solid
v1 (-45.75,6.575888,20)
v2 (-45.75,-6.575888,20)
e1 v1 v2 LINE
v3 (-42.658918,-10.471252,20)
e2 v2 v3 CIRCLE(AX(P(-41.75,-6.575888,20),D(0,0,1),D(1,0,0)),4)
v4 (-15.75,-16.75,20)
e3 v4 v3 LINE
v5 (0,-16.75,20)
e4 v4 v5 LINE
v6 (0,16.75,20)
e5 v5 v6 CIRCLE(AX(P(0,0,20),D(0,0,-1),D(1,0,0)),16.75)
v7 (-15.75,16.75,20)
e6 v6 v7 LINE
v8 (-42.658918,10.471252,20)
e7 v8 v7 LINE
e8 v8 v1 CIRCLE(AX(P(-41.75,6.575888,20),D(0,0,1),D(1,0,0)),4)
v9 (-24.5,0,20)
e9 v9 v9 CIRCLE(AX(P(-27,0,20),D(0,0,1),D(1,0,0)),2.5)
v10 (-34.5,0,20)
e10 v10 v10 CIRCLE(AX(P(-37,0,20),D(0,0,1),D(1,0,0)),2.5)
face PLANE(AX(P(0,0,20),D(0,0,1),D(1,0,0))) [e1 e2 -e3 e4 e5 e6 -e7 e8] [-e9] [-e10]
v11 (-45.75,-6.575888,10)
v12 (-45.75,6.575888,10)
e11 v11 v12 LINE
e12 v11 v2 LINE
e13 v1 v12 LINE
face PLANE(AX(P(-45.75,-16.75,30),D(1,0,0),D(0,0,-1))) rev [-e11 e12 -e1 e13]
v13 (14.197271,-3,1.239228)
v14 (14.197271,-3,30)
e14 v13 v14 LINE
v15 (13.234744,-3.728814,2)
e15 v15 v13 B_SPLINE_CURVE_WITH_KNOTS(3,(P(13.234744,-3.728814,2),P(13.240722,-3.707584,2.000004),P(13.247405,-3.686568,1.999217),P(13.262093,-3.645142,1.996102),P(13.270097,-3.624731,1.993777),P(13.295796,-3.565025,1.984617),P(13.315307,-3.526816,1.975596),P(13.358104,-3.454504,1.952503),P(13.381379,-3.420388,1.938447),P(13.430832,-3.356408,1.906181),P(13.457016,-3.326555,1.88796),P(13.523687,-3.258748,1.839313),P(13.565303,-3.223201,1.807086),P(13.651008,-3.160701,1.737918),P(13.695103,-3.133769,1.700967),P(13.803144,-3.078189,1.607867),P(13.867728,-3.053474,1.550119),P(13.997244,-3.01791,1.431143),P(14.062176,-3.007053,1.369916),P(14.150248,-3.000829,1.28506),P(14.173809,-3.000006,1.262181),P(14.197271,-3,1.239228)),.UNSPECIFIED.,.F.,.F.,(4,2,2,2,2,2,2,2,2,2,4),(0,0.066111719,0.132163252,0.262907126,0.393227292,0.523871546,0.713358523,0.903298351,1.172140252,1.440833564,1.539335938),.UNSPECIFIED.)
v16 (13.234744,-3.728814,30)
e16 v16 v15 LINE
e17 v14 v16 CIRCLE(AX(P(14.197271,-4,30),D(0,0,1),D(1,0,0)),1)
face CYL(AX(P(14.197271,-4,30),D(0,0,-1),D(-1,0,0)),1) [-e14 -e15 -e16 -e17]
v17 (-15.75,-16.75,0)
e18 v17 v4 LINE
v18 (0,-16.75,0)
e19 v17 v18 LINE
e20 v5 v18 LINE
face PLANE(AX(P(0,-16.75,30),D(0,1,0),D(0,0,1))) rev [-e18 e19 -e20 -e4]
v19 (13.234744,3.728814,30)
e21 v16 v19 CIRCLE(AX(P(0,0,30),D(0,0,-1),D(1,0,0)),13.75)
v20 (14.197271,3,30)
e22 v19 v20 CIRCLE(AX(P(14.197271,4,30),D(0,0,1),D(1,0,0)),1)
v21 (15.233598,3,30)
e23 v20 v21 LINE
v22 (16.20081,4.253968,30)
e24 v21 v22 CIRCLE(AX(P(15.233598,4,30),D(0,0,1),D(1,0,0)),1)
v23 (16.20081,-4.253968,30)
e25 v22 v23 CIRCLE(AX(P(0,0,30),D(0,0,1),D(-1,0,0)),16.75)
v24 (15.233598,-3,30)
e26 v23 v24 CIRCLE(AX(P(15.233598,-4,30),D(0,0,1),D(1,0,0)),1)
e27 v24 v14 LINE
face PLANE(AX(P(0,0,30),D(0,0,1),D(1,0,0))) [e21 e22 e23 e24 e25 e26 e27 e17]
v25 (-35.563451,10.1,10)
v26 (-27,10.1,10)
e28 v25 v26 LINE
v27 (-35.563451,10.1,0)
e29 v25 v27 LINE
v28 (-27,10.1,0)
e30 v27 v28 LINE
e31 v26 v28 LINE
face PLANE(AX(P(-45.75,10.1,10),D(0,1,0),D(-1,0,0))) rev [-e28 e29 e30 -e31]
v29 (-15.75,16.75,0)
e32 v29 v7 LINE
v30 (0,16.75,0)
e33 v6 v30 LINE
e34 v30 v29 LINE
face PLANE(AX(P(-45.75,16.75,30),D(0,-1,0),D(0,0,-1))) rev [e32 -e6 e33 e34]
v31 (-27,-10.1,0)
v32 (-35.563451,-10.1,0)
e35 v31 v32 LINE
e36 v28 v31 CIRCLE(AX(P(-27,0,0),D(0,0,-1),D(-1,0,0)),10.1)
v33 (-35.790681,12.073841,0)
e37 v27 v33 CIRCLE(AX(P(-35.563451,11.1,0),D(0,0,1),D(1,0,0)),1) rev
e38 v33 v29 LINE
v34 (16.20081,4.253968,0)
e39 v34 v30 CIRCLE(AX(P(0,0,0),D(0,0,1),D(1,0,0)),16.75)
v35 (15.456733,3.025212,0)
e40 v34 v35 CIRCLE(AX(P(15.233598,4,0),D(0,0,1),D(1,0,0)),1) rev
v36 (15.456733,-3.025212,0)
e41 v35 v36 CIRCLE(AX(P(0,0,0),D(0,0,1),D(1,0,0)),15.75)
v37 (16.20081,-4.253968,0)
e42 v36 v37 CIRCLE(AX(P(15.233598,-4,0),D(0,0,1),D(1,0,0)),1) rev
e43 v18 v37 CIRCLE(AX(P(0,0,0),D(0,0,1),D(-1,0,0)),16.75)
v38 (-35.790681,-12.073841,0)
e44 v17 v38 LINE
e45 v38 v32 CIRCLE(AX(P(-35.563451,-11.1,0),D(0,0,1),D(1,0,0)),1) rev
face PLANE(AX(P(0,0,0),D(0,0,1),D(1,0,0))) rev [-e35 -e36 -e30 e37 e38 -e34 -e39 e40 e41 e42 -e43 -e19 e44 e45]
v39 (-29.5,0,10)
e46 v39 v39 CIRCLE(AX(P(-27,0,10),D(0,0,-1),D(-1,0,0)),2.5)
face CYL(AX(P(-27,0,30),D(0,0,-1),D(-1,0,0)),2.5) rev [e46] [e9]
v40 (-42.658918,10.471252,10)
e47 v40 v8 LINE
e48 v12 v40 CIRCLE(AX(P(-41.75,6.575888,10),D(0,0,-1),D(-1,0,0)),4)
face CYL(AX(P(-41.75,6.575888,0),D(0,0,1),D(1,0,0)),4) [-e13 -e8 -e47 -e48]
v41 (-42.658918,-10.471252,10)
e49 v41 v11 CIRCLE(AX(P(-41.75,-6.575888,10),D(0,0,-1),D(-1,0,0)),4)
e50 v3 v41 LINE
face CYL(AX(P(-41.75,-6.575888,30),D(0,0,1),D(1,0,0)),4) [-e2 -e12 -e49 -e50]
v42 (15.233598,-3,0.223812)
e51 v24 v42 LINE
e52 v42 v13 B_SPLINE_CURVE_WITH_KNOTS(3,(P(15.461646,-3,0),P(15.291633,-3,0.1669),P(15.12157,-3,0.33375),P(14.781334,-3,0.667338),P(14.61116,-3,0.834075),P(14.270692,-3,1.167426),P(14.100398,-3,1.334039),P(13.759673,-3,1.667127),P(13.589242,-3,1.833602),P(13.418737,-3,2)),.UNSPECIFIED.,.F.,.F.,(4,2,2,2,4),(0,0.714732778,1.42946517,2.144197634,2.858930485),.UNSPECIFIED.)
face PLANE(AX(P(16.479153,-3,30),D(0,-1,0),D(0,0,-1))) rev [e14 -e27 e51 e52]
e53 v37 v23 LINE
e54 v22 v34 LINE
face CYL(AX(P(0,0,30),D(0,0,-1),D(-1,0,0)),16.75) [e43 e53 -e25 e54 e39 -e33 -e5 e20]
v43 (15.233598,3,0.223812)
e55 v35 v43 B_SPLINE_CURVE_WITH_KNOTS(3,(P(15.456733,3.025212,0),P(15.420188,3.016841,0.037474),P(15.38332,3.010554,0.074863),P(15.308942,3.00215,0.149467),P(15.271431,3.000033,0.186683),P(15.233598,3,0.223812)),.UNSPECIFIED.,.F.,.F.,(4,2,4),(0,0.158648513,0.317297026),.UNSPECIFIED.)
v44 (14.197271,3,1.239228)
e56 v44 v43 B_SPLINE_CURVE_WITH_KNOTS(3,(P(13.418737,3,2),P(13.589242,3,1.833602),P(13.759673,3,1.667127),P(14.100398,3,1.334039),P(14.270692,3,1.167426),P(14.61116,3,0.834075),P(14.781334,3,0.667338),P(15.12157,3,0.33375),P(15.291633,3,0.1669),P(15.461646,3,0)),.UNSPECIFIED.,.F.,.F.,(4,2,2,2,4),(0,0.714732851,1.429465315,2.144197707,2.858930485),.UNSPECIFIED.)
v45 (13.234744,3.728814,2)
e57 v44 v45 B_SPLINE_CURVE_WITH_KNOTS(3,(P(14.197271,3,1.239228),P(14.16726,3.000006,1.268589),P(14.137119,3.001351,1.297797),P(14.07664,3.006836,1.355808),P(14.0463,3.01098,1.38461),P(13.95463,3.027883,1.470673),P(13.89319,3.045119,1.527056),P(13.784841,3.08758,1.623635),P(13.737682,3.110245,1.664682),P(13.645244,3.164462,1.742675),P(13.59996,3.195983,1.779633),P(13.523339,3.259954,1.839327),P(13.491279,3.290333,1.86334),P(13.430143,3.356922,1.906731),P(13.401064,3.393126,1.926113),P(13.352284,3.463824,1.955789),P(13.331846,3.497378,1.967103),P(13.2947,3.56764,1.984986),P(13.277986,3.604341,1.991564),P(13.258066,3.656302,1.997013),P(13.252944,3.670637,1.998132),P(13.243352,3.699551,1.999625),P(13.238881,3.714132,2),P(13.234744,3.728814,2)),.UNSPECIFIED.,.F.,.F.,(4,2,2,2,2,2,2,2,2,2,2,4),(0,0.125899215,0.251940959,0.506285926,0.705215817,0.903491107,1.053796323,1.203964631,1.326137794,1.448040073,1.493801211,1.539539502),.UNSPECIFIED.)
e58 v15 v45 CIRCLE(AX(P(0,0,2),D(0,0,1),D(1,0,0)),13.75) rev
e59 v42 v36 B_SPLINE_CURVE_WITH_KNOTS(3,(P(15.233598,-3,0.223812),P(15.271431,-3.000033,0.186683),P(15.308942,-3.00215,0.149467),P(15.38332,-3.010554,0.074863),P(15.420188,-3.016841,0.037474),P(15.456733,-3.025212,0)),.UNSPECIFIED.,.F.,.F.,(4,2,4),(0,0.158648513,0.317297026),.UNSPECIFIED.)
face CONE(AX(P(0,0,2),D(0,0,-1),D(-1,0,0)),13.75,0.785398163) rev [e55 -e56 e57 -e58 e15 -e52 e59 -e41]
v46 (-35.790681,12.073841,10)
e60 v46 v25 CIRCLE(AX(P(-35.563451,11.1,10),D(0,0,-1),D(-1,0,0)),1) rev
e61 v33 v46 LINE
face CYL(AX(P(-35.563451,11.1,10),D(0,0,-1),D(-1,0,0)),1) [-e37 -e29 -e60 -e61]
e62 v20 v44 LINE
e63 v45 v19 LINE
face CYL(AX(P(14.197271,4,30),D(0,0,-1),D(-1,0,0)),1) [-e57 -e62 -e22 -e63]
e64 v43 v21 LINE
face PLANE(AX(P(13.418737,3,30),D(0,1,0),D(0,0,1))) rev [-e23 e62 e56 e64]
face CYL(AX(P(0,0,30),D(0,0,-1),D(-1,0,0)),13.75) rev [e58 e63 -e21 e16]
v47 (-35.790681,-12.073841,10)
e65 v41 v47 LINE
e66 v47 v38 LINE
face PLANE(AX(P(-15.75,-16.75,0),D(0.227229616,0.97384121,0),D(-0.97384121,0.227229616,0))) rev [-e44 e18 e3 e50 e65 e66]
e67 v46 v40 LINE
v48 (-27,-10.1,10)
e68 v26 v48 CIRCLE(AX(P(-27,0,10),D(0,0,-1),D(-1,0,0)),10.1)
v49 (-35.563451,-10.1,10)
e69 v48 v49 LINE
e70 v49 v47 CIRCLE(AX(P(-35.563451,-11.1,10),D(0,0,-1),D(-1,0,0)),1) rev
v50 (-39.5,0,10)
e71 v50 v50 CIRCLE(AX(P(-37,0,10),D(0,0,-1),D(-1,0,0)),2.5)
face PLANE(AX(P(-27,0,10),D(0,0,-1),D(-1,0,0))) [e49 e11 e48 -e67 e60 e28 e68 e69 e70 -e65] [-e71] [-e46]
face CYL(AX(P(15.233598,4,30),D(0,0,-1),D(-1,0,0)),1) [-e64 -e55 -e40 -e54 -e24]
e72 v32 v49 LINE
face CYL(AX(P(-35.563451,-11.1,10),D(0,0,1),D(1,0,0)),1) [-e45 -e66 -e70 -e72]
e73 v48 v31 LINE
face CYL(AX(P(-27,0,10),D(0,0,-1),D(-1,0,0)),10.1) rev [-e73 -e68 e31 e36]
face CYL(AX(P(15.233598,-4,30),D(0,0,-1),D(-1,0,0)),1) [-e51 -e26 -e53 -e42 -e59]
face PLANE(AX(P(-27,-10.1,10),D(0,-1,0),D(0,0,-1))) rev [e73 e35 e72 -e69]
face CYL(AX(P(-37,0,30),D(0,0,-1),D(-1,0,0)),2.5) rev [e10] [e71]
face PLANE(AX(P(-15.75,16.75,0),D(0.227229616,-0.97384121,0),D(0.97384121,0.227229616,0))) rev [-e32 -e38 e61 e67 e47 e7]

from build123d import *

# Parameters (mm, degrees)
ESQUISSE1_R             = 2.5
BOSS_EXTRU_1_DEPTH      = 30
CHANFREIN1_SIZE         = 2
CONG_2_R                = 1
ENL_V_MAT_EXTRU_1_DEPTH = 10
ENL_V_START             = -10
ENL_V_MAT_EXTRU_2_DEPTH = 10
ENL_V_MAT_EXTRU_3_DEPTH = 53.665216263
CONG_3_R                = 1
CONG_4_R                = 4


with BuildPart() as part:
    # Esquisse1 → Boss.-Extru.1 (new body)
    with BuildSketch(Plane.XY):
        with BuildLine():
            Line((13.4187369, 3), (16.479153498, 3))
            ThreePointArc((16.479153498, 3), (10.731088016, 12.861036117), (0, 16.75))
            Line((0, 16.75), (-45.75, 16.75))
            Line((-45.75, 16.75), (-45.75, -16.75))
            Line((-45.75, -16.75), (0, -16.75))
            ThreePointArc((0, -16.75), (10.731088016, -12.861036117), (16.479153498, -3))
            Line((16.479153498, -3), (13.4187369, -3))
            ThreePointArc((13.4187369, -3), (-13.75, 0), (13.4187369, 3))
        make_face()
        with Locations((-37, 0)):
            Circle(ESQUISSE1_R, mode=Mode.SUBTRACT)
        with Locations((-27, 0)):
            Circle(ESQUISSE1_R, mode=Mode.SUBTRACT)
    extrude(amount=BOSS_EXTRU_1_DEPTH)

    # Chanfrein1
    chanfrein1_edges = [part.edges().sort_by_distance(p)[0] for p in [
        (-13.75, 0, 0),
    ]]
    chamfer(chanfrein1_edges, length=CHANFREIN1_SIZE)

    # Congé2
    # the kernel refuses this fillet: 1 mm, written as the material it takes off along each edge
    with BuildSketch(Plane(origin=(16.479153498, -3, -3.211221849), x_dir=(-1, 0, 0), z_dir=(0, 0, 1))) as cong_2_piece_1:
        with BuildLine():
            CenterArc((1.245555761, 1), CONG_2_R, 165.287542039, 104.712457961)
            ThreePointArc((0.278343206, 1.253968254), (0.127146972, 0.629653233), (0, 0))
            Line((0, 0), (1.245555761, 0))
        make_face()
    extrude(amount=36.422443699, mode=Mode.SUBTRACT)
    with BuildSketch(Plane(origin=(16.479153498, 3, -3.211221849), x_dir=(-1, 0, 0), z_dir=(0, 0, 1))) as cong_2_piece_2:
        with BuildLine():
            CenterArc((1.245555761, -1), CONG_2_R, 90, 104.712457961)
            ThreePointArc((0.278343206, -1.253968254), (0.127146972, -0.629653233), (0, 0))
            Line((0, 0), (1.245555761, 0))
        make_face()
    extrude(amount=36.422443699, mode=Mode.SUBTRACT)
    with BuildSketch(Plane(origin=(13.4187369, -3, 0.05366509), x_dir=(1, 0, 0), z_dir=(0, 0, 1))) as cong_2_piece_3:
        with BuildLine():
            CenterArc((0.778533964, -1), CONG_2_R, 90, 74.265120821)
            ThreePointArc((-0.183992874, -0.728813559), (-0.087015193, -0.365664321), (0, 0))
            Line((0, 0), (0.778533964, 0))
        make_face()
    extrude(amount=31.892669821, mode=Mode.SUBTRACT)
    with BuildSketch(Plane(origin=(13.4187369, 3, 0.05366509), x_dir=(-0.24477558700132723, 0.9695797605190384, 0), z_dir=(0, 0, 1))) as cong_2_piece_4:
        with BuildLine():
            CenterArc((0.779013652, -0.999626362), CONG_2_R, 91.566307169, 74.265120821)
            Line((-0.190566108, -0.754850775), (0, 0))
            ThreePointArc((0, 0), (0.37583992, -0.005137529), (0.75167984, 0))
        make_face()
    extrude(amount=31.892669821, mode=Mode.SUBTRACT)

    # Esquisse2 → Enlèv. mat.-Extru.1 (cut)
    with BuildSketch(Plane(origin=(0, 0, 0), x_dir=(-1, 0, 0), z_dir=(0, 0, -1))):
        with BuildLine():
            Line((45.75, 10.1), (27, 10.1))
            ThreePointArc((27, 10.1), (16.9, 0), (27, -10.1))
            Line((27, -10.1), (45.75, -10.1))
            Line((45.75, -10.1), (45.75, 10.1))
        make_face()
    extrude(amount=-ENL_V_MAT_EXTRU_1_DEPTH, mode=Mode.SUBTRACT)

    # Esquisse3 → Enlèv. mat.-Extru.2 (cut)
    with BuildSketch(Plane.XY.offset(30).offset(ENL_V_START)):
        with BuildLine():
            Line((0, 16.75), (-45.75, 16.75))
            Line((-45.75, 16.75), (-45.75, -16.75))
            Line((-45.75, -16.75), (0, -16.75))
            ThreePointArc((0, -16.75), (-16.75, 0), (0, 16.75))
        make_face()
    extrude(amount=ENL_V_MAT_EXTRU_2_DEPTH, mode=Mode.SUBTRACT)

    # Esquisse5 → Enlèv. mat.-Extru.3 (cut, through all)
    with BuildSketch(Plane.XY.offset(20)):
        Polygon((-15.75, 16.75), (-45.75, 9.75), (-45.75, 16.75), align=None)
        Polygon((-45.75, -16.75), (-15.75, -16.75), (-45.75, -9.75), align=None)
    extrude(amount=-ENL_V_MAT_EXTRU_3_DEPTH, mode=Mode.SUBTRACT)

    # Congé3
    cong_3_edges = [part.edges().sort_by_distance(p)[0] for p in [
        (-44.25, 10.1, 5),
        (-44.25, -10.1, 5),
    ]]
    fillet(cong_3_edges, radius=CONG_3_R)

    # Congé4
    cong_4_edges = [part.edges().sort_by_distance(p)[0] for p in [
        (-45.75, 9.75, 15),
        (-45.75, -9.75, 15),
    ]]
    fillet(cong_4_edges, radius=CONG_4_R)


solid = part.part
